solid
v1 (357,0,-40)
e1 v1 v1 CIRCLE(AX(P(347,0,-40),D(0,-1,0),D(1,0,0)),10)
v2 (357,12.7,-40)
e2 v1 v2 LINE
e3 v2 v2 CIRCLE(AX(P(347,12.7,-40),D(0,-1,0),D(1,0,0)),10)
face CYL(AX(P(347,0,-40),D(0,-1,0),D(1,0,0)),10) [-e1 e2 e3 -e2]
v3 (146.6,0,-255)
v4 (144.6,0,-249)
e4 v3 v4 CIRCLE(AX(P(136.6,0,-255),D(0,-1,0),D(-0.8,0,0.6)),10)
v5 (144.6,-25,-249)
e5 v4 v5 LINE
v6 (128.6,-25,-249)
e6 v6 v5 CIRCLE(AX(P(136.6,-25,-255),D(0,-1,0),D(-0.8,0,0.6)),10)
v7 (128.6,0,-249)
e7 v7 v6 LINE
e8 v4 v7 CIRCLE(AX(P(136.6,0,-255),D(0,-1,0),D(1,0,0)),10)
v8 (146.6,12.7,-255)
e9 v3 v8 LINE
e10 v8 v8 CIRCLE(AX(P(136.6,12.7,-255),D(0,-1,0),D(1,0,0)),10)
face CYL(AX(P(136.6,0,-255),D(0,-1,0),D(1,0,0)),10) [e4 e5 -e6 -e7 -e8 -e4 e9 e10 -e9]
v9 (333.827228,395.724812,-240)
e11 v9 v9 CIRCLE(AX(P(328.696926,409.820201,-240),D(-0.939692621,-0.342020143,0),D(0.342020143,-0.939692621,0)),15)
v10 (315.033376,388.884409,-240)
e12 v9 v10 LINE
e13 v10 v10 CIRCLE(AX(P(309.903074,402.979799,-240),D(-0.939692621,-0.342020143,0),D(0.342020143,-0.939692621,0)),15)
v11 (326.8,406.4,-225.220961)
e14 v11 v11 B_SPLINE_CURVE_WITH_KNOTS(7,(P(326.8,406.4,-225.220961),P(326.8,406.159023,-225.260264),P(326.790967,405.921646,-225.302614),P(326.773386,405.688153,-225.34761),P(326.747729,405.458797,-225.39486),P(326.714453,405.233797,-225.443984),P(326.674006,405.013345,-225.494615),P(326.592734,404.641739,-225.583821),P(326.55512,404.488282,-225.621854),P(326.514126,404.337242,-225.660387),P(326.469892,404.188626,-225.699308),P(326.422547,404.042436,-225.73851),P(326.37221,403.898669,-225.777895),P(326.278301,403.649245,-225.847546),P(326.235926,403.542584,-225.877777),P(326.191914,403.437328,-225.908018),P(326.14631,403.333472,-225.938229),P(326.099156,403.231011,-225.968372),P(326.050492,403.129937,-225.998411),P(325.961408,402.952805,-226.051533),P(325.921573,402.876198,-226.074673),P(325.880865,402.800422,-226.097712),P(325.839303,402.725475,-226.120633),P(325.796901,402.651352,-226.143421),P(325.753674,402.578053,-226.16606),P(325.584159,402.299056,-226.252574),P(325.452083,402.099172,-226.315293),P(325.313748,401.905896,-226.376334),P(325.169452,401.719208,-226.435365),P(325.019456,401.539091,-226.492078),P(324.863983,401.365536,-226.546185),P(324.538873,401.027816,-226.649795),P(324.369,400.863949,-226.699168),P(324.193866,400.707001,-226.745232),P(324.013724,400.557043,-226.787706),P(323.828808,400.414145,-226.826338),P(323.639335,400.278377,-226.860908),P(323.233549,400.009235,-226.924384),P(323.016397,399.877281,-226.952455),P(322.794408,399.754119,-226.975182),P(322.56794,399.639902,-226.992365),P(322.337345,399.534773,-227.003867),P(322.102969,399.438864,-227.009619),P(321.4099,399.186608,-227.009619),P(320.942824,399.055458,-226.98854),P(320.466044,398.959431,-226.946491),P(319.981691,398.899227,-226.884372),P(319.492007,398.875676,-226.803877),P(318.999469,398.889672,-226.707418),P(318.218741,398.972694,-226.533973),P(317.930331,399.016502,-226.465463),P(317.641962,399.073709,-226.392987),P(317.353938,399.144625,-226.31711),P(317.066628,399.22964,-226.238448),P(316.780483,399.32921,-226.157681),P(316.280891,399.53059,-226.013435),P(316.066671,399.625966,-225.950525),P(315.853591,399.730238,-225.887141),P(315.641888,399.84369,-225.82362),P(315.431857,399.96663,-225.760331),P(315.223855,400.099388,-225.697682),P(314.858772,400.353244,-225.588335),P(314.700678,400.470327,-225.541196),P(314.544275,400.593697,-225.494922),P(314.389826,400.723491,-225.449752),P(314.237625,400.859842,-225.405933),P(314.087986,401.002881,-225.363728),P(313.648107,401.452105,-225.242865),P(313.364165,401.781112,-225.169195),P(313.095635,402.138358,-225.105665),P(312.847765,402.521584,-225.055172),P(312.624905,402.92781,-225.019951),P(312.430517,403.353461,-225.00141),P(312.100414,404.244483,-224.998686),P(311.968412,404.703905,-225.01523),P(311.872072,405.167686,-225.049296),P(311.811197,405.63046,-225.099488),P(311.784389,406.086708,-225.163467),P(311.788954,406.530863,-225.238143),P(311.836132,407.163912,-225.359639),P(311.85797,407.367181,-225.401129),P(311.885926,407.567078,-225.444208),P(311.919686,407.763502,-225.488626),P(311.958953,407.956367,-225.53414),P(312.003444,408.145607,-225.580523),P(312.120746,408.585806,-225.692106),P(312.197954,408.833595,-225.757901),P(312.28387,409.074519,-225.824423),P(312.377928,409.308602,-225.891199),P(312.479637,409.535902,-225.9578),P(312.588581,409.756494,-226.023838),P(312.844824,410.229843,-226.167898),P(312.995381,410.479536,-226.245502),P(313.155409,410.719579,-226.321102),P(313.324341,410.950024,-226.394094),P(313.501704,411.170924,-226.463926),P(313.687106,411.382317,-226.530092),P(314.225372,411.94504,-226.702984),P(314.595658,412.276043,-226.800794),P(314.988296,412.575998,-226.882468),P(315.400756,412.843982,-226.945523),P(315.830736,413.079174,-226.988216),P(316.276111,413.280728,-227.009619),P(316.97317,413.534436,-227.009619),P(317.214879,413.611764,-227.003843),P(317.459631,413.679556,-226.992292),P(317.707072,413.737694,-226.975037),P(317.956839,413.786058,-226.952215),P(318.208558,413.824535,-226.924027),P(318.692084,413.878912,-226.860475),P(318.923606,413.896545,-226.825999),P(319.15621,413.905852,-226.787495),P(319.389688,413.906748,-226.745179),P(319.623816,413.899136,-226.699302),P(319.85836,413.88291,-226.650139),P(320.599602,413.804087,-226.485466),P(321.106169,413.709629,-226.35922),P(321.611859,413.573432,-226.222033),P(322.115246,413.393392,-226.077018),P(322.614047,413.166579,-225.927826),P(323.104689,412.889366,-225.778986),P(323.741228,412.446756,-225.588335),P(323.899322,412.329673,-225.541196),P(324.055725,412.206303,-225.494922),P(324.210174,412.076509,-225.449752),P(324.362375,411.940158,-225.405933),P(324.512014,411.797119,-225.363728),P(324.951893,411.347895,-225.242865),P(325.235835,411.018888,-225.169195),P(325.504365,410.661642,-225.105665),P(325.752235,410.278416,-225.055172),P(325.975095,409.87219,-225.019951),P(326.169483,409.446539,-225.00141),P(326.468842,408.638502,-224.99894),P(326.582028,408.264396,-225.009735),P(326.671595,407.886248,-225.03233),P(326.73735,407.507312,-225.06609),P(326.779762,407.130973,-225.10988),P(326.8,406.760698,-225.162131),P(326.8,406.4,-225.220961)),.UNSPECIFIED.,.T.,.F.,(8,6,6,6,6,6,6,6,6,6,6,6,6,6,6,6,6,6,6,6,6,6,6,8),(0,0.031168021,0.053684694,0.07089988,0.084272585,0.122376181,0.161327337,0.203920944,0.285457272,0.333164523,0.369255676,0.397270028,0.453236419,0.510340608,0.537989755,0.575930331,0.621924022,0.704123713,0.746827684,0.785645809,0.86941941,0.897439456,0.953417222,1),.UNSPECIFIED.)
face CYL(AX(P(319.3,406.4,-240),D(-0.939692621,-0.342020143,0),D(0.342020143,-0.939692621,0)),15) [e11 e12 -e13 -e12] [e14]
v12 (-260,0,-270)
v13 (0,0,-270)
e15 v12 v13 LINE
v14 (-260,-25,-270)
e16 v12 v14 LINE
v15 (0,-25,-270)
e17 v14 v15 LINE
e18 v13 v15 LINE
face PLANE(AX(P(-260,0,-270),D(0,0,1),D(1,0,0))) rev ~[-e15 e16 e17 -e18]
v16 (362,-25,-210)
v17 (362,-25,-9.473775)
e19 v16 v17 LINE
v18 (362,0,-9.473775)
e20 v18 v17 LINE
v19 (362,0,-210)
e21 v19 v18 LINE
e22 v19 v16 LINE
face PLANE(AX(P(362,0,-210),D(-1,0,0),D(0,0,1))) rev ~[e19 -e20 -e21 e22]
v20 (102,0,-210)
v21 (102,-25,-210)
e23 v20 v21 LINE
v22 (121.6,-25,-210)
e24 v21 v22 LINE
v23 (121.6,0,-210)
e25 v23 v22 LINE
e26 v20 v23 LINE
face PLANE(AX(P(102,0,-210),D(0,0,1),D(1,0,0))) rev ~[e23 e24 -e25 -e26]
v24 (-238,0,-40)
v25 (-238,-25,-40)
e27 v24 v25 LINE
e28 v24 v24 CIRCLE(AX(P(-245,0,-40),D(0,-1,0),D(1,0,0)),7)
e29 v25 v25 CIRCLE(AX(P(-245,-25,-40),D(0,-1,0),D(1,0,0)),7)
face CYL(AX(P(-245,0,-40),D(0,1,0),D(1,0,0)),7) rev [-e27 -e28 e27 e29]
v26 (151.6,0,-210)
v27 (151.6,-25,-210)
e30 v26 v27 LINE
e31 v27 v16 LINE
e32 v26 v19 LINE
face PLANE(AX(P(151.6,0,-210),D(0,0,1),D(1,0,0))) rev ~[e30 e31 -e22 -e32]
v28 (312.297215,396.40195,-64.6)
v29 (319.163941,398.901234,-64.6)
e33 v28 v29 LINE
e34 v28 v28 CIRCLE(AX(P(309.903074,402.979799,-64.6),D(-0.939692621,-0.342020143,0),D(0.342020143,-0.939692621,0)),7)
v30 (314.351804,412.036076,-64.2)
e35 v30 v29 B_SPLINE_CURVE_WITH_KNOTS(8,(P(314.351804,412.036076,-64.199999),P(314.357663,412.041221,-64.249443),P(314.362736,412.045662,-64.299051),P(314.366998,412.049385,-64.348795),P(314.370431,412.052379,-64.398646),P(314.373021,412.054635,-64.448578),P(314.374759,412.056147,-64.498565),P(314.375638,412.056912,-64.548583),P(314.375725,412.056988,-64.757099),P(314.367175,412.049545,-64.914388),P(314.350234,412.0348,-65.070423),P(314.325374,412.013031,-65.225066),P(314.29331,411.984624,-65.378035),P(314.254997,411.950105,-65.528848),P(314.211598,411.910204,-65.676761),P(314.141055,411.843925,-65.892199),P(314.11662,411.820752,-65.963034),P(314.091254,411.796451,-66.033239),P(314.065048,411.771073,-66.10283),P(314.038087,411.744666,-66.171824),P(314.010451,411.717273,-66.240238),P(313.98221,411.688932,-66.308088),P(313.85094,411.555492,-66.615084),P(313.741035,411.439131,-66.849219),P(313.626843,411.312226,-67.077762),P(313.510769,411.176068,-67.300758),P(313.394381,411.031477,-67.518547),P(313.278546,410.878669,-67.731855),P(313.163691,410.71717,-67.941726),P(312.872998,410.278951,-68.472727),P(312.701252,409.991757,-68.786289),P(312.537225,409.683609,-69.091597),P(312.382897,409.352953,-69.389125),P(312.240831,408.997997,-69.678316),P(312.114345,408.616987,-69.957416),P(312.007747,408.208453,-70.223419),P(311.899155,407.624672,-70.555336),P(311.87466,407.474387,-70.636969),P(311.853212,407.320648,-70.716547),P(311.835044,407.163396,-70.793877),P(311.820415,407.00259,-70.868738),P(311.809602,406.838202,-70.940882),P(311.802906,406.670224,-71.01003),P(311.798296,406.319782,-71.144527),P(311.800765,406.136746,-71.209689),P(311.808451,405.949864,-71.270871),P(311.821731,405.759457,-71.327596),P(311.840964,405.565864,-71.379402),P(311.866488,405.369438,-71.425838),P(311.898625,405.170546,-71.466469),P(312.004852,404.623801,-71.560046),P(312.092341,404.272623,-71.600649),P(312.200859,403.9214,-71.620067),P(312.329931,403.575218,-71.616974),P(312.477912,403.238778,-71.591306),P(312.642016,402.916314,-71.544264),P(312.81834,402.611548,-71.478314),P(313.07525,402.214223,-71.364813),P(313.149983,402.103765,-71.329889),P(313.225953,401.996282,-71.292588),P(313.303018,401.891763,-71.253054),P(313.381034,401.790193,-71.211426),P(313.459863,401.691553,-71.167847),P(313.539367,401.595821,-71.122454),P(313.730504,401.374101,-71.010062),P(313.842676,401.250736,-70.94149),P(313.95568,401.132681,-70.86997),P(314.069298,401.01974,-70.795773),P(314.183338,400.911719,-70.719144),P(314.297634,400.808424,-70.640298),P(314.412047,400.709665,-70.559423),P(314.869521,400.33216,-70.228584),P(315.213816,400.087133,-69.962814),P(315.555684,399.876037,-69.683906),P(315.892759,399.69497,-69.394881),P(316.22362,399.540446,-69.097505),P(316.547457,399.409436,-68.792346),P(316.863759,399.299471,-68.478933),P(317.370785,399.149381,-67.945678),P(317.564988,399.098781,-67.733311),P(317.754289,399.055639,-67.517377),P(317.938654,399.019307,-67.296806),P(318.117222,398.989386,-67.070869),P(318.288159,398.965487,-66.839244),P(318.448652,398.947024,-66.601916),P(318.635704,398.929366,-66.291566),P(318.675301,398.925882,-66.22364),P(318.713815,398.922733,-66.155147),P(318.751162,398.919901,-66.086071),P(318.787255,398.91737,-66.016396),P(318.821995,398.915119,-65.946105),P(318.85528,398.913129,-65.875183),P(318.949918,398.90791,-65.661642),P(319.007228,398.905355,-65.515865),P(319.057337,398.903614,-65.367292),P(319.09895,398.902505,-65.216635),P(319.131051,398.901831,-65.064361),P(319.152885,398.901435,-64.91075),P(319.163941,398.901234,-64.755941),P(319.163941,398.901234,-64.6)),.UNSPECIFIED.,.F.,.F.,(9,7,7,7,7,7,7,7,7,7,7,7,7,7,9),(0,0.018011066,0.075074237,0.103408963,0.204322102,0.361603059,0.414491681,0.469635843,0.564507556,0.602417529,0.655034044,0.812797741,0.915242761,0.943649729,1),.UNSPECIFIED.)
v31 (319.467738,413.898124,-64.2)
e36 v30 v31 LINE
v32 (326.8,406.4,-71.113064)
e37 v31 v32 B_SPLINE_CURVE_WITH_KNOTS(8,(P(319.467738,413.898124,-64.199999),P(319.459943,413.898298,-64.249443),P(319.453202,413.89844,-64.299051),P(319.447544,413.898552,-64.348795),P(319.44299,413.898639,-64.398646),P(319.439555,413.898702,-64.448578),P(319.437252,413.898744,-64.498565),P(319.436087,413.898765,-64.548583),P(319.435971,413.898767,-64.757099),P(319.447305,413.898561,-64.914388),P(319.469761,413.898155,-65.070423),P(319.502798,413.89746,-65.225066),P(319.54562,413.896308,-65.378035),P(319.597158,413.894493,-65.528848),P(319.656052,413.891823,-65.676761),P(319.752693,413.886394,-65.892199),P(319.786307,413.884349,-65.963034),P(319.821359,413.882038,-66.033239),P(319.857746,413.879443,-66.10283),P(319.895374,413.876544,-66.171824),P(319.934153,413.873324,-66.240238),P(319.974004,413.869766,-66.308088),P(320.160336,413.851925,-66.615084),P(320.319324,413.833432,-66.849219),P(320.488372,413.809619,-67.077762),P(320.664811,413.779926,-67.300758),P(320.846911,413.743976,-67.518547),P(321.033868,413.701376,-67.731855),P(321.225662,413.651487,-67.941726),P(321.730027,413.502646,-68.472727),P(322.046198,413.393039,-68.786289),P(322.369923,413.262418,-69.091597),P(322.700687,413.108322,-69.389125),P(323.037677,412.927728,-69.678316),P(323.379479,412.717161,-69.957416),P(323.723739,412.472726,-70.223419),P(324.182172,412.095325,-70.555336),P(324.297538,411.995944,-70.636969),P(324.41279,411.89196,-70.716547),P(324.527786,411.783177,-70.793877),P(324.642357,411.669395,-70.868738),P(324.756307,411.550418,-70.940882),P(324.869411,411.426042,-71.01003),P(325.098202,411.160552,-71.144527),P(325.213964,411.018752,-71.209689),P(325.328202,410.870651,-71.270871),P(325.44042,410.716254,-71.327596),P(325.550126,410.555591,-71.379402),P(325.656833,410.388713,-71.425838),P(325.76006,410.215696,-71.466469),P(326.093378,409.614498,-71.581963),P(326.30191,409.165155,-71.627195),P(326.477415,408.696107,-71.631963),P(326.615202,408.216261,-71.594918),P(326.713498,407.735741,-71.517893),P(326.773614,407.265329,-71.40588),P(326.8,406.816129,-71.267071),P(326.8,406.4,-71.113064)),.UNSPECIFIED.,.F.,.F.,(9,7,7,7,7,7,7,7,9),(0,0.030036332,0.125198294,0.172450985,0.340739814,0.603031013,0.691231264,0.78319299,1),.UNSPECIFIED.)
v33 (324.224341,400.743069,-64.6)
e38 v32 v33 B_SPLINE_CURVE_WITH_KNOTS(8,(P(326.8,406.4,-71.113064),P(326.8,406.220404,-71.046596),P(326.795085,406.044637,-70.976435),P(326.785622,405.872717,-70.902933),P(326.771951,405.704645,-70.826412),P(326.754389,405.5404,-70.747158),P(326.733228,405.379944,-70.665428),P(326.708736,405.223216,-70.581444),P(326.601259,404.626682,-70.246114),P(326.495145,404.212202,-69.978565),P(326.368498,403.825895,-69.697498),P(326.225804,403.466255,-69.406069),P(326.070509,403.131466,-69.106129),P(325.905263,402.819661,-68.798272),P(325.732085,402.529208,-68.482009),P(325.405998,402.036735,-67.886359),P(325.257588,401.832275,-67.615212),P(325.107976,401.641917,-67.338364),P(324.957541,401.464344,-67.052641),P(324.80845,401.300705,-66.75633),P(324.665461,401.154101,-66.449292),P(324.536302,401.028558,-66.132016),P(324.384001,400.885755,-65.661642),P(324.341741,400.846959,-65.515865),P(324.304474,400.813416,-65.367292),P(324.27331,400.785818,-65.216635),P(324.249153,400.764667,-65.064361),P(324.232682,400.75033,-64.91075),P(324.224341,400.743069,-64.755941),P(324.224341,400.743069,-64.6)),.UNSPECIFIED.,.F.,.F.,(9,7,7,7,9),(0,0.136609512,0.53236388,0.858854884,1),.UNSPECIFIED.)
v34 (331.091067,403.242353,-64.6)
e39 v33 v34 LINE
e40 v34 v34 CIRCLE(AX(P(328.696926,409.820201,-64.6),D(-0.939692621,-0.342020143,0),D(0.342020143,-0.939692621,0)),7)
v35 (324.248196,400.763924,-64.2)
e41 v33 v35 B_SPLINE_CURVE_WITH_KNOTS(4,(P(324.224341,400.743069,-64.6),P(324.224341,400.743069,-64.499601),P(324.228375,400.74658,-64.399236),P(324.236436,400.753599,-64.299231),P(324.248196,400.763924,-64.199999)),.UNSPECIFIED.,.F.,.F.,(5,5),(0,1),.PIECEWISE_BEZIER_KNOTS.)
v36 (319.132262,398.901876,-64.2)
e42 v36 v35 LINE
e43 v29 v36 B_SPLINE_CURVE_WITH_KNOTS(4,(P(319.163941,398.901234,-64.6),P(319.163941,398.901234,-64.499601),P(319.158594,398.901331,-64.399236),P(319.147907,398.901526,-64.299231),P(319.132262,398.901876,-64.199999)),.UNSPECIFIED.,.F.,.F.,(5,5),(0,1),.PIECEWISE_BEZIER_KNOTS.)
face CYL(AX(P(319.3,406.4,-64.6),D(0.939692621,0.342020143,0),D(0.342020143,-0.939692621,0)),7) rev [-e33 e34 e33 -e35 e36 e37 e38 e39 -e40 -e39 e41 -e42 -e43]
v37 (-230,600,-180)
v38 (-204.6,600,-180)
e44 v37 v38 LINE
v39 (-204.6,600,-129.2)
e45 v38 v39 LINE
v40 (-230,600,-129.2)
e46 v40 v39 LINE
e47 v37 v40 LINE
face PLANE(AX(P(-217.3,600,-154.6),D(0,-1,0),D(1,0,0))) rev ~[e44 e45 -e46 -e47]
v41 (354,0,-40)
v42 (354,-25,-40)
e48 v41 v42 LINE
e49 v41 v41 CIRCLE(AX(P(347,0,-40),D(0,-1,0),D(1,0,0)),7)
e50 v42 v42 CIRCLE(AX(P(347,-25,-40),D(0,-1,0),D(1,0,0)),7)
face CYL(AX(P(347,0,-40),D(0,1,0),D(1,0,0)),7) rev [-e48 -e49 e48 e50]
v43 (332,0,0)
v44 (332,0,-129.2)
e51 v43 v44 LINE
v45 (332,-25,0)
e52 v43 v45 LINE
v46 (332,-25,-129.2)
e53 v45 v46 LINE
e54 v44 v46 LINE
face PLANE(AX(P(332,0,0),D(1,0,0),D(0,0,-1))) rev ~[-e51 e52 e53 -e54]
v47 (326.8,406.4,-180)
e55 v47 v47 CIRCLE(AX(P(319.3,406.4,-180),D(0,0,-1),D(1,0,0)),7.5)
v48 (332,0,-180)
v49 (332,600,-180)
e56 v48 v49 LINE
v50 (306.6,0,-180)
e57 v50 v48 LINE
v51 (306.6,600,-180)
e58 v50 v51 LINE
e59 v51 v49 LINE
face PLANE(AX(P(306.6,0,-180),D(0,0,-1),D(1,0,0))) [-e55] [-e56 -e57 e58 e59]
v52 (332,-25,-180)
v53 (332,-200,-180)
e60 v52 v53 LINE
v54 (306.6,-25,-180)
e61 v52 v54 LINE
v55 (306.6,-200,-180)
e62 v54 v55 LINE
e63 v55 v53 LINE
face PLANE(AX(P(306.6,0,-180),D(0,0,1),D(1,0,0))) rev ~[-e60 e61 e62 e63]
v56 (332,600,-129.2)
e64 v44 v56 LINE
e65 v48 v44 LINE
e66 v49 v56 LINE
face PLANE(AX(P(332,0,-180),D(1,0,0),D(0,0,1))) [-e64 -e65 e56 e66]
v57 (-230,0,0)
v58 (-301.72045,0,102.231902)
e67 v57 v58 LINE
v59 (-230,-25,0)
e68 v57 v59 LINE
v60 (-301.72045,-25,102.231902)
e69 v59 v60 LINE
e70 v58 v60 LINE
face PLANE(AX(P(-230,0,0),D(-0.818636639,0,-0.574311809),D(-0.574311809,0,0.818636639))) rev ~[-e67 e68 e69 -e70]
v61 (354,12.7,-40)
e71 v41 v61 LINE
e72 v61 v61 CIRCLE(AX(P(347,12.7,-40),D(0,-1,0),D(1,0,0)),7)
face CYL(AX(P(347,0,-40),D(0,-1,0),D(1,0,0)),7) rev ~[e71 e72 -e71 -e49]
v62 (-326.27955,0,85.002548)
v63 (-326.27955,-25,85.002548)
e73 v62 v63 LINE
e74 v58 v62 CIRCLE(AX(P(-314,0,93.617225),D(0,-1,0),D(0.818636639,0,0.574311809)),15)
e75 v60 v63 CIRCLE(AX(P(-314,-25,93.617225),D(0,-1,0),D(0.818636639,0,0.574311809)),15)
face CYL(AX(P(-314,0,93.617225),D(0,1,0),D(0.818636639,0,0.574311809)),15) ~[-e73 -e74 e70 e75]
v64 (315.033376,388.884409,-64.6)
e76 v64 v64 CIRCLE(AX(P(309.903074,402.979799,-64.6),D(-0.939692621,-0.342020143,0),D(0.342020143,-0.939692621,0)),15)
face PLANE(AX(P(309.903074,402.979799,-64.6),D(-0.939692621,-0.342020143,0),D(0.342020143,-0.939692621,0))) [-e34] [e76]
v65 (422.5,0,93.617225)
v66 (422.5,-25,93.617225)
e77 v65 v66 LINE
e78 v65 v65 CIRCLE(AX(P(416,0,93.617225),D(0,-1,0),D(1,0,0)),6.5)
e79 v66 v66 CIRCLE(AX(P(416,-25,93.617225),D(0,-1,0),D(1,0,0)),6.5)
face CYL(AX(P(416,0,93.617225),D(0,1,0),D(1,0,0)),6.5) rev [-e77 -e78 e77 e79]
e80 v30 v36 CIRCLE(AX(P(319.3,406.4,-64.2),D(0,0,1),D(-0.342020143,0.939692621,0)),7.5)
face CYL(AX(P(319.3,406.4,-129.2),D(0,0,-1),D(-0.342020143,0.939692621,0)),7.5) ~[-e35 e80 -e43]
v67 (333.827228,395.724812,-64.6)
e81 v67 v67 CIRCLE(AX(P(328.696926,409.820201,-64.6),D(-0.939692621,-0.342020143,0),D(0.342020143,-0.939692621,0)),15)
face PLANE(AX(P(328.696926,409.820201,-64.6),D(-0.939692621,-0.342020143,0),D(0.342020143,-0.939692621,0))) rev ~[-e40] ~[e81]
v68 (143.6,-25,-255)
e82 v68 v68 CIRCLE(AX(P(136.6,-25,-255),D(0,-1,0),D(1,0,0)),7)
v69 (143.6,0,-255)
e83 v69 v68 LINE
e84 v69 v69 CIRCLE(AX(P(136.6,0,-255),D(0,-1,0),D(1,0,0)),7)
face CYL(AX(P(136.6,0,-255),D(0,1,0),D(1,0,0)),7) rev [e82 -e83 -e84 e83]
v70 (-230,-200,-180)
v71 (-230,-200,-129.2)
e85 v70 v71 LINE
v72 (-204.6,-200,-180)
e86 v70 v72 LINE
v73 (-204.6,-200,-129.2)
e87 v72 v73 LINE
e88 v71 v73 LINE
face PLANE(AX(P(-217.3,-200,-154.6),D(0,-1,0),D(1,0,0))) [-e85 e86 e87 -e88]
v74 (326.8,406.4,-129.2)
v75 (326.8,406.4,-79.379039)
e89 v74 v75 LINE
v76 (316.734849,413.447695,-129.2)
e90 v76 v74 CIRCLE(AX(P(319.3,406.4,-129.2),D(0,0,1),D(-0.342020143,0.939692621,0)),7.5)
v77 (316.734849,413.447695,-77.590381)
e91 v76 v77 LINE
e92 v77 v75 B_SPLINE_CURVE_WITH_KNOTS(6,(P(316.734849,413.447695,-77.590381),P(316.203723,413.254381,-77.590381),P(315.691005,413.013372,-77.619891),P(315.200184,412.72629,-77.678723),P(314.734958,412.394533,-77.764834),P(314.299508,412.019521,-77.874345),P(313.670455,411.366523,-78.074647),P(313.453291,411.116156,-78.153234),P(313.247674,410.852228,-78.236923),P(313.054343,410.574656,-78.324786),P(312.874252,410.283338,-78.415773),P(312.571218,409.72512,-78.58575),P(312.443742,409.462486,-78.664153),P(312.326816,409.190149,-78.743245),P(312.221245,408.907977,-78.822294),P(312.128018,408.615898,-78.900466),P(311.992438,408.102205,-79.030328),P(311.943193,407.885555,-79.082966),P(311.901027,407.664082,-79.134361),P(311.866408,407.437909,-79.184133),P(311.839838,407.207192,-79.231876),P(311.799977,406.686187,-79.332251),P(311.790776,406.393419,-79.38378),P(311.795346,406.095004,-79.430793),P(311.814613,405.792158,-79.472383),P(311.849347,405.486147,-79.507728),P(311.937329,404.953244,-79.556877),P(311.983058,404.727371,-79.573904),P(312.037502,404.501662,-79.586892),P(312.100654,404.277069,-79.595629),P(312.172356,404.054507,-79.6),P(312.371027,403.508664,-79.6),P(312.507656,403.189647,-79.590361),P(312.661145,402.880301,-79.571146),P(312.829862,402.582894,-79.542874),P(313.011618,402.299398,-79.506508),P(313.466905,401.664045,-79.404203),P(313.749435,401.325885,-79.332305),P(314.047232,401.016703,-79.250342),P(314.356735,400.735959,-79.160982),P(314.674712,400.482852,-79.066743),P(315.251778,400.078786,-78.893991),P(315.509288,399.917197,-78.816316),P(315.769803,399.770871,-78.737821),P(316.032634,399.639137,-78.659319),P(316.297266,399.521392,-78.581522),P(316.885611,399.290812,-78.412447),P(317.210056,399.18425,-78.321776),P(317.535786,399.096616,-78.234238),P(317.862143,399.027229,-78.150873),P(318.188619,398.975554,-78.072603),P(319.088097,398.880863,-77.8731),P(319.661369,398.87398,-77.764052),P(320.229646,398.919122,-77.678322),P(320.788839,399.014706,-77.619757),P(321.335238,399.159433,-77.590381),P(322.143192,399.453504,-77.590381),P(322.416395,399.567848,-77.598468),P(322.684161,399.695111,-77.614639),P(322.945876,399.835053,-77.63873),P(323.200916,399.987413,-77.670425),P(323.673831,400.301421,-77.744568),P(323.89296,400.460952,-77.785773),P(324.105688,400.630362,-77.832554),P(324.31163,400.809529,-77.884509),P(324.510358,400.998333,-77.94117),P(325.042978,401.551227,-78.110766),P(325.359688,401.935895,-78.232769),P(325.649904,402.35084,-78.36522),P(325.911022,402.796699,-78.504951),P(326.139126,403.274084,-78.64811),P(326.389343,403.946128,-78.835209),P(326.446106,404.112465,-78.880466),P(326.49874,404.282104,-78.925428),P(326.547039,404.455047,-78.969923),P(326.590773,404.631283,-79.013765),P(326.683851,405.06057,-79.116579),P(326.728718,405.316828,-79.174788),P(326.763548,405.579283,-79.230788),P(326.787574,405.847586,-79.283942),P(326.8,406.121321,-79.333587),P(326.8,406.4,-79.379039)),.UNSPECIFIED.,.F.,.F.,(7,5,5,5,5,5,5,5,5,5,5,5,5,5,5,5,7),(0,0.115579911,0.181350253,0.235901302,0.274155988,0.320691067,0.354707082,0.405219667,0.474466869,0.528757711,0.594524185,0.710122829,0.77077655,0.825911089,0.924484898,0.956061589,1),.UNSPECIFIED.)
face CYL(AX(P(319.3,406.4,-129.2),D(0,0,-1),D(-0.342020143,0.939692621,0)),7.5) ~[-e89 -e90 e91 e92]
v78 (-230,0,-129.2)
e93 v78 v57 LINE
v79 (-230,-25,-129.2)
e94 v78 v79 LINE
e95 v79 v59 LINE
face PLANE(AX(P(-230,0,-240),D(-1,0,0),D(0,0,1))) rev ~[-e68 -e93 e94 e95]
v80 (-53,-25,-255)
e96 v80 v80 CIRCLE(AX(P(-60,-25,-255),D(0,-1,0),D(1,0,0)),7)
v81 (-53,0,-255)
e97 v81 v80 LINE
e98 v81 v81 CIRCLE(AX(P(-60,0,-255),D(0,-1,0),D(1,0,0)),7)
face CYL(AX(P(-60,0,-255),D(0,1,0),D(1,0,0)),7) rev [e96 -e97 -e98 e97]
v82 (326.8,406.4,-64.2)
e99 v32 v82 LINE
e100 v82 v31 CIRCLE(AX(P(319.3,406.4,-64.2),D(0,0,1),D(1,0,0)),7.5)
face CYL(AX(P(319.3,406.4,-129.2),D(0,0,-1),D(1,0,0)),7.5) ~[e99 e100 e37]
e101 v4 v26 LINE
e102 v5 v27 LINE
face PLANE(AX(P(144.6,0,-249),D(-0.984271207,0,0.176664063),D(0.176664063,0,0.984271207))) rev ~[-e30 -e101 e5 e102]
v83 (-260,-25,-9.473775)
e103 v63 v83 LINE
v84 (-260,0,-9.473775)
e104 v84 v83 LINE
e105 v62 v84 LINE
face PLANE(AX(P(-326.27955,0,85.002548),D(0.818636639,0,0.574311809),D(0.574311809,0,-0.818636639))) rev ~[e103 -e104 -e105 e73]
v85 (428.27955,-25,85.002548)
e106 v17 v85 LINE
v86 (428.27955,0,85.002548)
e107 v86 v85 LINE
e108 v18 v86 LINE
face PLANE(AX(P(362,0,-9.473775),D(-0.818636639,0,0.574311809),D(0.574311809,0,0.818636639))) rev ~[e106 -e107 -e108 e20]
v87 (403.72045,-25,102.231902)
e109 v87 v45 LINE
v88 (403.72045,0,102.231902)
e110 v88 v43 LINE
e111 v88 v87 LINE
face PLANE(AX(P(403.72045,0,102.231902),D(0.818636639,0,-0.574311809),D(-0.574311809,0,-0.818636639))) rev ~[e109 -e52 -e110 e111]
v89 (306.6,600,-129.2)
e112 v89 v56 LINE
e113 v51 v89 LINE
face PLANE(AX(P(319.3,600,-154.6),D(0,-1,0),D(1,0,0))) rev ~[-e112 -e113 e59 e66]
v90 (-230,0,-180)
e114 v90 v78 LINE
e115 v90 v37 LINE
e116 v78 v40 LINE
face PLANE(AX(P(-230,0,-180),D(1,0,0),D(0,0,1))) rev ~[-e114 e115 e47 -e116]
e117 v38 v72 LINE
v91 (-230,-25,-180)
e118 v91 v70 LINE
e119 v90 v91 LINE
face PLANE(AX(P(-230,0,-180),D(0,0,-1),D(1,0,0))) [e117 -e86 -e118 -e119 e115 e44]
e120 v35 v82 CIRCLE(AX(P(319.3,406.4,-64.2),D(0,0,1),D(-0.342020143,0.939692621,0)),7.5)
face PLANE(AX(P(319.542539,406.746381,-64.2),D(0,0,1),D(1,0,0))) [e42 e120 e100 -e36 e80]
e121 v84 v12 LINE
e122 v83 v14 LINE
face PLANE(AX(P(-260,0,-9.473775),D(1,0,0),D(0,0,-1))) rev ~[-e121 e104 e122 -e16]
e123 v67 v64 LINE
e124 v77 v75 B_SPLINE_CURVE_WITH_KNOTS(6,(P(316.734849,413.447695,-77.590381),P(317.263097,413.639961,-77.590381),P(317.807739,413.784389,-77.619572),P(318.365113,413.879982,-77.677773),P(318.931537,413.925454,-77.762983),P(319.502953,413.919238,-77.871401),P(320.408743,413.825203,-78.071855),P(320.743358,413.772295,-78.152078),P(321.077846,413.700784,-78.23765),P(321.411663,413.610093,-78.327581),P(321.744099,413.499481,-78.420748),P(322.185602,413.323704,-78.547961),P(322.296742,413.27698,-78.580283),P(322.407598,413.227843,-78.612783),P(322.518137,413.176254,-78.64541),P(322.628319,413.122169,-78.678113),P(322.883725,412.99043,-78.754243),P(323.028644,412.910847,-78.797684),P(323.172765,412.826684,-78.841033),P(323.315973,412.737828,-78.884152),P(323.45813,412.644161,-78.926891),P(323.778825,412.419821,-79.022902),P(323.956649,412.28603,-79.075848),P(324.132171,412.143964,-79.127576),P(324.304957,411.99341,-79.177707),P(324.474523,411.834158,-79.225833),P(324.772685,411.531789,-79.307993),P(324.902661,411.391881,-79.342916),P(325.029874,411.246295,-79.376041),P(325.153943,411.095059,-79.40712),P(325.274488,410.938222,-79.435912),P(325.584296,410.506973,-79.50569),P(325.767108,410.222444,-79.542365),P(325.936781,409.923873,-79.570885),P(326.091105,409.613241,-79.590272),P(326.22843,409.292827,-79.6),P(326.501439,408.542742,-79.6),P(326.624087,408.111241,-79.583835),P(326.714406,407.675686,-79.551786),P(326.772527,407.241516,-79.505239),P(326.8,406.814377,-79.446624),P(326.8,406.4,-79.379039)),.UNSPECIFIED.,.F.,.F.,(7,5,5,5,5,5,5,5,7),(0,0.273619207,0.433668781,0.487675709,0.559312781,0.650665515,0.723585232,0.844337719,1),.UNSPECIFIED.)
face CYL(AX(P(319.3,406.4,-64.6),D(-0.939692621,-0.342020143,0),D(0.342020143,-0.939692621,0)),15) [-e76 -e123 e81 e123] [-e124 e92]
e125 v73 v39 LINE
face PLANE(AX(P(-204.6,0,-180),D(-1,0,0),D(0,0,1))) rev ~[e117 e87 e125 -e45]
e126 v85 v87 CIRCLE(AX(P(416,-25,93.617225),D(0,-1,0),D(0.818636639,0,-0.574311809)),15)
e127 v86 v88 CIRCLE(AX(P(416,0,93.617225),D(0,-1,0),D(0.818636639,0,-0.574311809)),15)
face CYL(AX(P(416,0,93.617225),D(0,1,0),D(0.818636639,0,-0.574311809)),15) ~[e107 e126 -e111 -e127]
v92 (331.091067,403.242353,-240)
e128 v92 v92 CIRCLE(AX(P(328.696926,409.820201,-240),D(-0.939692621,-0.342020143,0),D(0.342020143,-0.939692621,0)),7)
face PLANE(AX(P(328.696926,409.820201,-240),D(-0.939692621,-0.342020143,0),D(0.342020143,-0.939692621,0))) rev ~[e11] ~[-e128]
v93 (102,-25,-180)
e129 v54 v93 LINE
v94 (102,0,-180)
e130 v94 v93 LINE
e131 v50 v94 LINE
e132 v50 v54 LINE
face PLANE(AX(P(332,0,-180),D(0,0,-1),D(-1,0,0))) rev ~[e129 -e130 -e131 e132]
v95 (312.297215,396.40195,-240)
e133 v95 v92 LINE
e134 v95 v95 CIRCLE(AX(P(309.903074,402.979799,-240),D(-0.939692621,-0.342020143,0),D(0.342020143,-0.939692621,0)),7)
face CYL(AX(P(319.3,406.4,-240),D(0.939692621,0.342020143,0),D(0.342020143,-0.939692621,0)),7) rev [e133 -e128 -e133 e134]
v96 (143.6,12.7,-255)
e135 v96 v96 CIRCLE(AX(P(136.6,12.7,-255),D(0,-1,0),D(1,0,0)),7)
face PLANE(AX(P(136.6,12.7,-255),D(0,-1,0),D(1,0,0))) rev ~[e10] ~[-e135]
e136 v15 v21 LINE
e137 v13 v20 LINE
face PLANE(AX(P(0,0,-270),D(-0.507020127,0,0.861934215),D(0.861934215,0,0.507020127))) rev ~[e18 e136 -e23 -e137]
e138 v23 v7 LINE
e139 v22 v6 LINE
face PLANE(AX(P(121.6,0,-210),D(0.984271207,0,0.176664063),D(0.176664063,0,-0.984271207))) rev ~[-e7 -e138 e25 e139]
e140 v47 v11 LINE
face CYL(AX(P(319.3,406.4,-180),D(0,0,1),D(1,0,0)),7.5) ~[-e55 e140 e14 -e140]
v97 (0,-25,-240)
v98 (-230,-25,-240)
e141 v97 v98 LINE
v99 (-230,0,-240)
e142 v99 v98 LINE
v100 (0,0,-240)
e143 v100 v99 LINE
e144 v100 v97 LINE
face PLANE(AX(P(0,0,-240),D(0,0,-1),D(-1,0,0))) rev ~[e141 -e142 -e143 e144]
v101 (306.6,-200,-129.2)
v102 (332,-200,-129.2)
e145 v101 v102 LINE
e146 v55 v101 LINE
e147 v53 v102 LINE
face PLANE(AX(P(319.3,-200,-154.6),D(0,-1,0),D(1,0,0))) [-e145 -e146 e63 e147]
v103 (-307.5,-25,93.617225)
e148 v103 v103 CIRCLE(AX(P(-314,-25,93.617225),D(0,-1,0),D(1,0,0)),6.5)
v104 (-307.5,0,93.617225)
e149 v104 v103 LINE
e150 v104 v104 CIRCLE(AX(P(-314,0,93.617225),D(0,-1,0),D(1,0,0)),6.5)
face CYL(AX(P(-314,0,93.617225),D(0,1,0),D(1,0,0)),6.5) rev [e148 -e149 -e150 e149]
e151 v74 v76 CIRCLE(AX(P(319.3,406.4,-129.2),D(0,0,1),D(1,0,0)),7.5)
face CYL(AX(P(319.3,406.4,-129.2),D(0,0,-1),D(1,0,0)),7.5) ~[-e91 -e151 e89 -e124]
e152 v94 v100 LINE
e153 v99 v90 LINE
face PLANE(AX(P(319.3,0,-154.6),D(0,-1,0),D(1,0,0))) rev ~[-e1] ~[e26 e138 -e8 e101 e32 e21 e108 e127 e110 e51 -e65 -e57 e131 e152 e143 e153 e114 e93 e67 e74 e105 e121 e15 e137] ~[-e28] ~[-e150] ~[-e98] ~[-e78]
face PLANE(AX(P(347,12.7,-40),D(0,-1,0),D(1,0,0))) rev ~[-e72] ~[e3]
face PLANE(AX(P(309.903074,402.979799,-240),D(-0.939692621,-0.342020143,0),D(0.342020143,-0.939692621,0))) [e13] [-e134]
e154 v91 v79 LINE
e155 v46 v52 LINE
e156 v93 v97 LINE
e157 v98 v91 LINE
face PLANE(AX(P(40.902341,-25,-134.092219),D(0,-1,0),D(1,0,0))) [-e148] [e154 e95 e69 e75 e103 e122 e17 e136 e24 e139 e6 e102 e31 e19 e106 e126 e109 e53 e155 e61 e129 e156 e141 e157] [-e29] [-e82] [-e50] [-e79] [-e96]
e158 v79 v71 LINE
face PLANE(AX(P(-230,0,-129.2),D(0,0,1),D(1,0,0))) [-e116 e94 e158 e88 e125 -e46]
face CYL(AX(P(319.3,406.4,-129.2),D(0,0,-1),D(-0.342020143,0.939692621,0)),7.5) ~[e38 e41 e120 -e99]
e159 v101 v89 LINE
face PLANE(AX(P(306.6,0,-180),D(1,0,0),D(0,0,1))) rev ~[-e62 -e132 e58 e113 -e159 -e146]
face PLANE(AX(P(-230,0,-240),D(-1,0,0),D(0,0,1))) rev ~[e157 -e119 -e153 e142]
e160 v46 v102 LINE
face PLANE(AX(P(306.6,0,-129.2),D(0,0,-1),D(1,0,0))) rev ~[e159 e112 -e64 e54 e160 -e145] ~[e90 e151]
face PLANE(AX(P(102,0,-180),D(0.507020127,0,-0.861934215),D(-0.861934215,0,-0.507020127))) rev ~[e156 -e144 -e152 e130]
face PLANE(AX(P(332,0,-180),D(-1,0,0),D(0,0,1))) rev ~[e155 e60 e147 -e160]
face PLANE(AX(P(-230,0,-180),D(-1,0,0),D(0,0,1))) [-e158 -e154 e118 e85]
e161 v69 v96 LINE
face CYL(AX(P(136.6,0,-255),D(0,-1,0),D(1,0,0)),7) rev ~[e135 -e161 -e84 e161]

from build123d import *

# Parameters (mm, degrees)
F0_R          = 7
F0_R_2        = 6.5
F1_DEPTH      = 25
F2_W          = 25.4
F2_H          = 50.8
F3_DEPTH      = 200
F3_DEPTH_BACK = 600
F6_DEPTH      = 65
F8_R          = 15
F8_R_2        = 7
F9_DEPTH      = 10
F10_R         = 15
F10_R_2       = 7
F11_DEPTH     = 10
F12_R         = 7.5
F13_REACH     = 111.2142034356
F14_R         = 10
F14_R_2       = 7
F15_DEPTH     = 12.7
F16_R         = 10
F16_R_2       = 7
F17_DEPTH     = 12.7


with BuildPart() as f1:
    # F0 (on Front) → F1 (new body)
    with BuildSketch(Plane.XZ):
        with BuildLine():
            Line((-230, 0), (-301.7204504189, 102.2319018363))
            ThreePointArc((-301.7204504189, 102.2319018363), (-322.6146771319, 105.8967742855), (-326.2795495811, 85.0025475726))
            Line((-326.2795495811, 85.0025475726), (-260, -9.4737749679))
            Line((-260, -9.4737749679), (-260, -270))
            Line((-260, -270), (0, -270))
            Line((0, -270), (102, -210))
            Line((102, -210), (121.6, -210))
            Line((121.6, -210), (128.6, -249))
            ThreePointArc((128.6, -249), (136.6, -265), (144.6, -249))
            Line((144.6, -249), (151.6, -210))
            Line((151.6, -210), (362, -210))
            Line((362, -210), (362, -9.4737749679))
            Line((362, -9.4737749679), (428.2795495811, 85.0025475726))
            ThreePointArc((428.2795495811, 85.0025475726), (424.6146771319, 105.8967742855), (403.7204504189, 102.2319018363))
            Line((403.7204504189, 102.2319018363), (332, 0))
            Line((332, 0), (332, -129.2))
            Line((332, -129.2), (332, -180))
            Line((332, -180), (306.6, -180))
            Line((306.6, -180), (102, -180))
            Line((102, -180), (0, -240))
            Line((0, -240), (-230, -240))
            Line((-230, -240), (-230, 0))
        make_face()
        with Locations((-60, -255)):
            Circle(F0_R, mode=Mode.SUBTRACT)
        with Locations((136.6, -255)):
            Circle(F0_R, mode=Mode.SUBTRACT)
        with Locations((-245, -40)):
            Circle(F0_R, mode=Mode.SUBTRACT)
        with Locations((-314, 93.6172247045)):
            Circle(F0_R_2, mode=Mode.SUBTRACT)
        with Locations((347, -40)):
            Circle(F0_R, mode=Mode.SUBTRACT)
        with Locations((416, 93.6172247045)):
            Circle(F0_R_2, mode=Mode.SUBTRACT)
    extrude(amount=F1_DEPTH)

    # F2 (on Front) → F3 (join, two sides)
    with BuildSketch(Plane.XZ) as f3_sk:
        with Locations((319.3, -154.6)):
            Rectangle(F2_W, F2_H)
        with Locations((-217.3, -154.6)):
            Rectangle(F2_W, F2_H)
    extrude(amount=F3_DEPTH)
    extrude(f3_sk.sketch, amount=-F3_DEPTH_BACK)

    # F5 (on face) → F6 (join)
    with BuildSketch(Plane.XY.offset(-129.2)):
        with BuildLine():
            ThreePointArc((316.7348489251, 413.4476946559), (314.9981767274, 400.2563596678), (326.8, 406.4))
            ThreePointArc((326.8, 406.4), (323.6018232726, 412.5436403322), (316.7348489251, 413.4476946559))
        make_face()
    extrude(amount=F6_DEPTH)

    # F8 (on face) → F9 (join, symmetric)
    with BuildSketch(Plane(origin=(412.5634376322, 150.1608110447, 0), x_dir=(0.3420201433, -0.9396926208, 0), z_dir=(-0.9396926208, -0.3420201433, 0))):
        with Locations((-272.6840493235, -64.6)):
            Circle(F8_R)
        with Locations((-272.6840493235, -64.6)):
            Circle(F8_R_2, mode=Mode.SUBTRACT)
    extrude(amount=F9_DEPTH, both=True)



with BuildPart() as f11:
    # F10 (on face) → F11 (new body, symmetric)
    with BuildSketch(Plane(origin=(412.5634376322, 150.1608110447, 0), x_dir=(0.3420201433, -0.9396926208, 0), z_dir=(-0.9396926208, -0.3420201433, 0))):
        with Locations((-272.6840493235, -240)):
            Circle(F10_R)
        with Locations((-272.6840493235, -240)):
            Circle(F10_R_2, mode=Mode.SUBTRACT)
    extrude(amount=F11_DEPTH, both=True)


with BuildPart() as f1_1:
    add(f1.part)

    add(f11.part)  # F13 merges F11
    f13_end = f1_1.faces().sort_by_distance((314.1696978501, 420.4953893118, -240))[0]
    # F12 (on face) → F13 (join, up to a face of the model that its end follows)
    with BuildSketch(Plane(origin=(0, 0, -180), x_dir=(1, 0, 0), z_dir=(0, 0, -1))):
        with Locations((319.3, -406.4)):
            Circle(F12_R)
    f13_long = extrude(amount=F13_REACH, mode=Mode.PRIVATE)
    add(split(f13_long, bisect_by=f13_end, keep=Keep.ALL, mode=Mode.PRIVATE).solids().sort_by_distance((319.3, 406.4, -180))[0])

    # F14 (on face) → F15 (join)
    with BuildSketch(Plane.XZ):
        with Locations((136.6, -255)):
            Circle(F14_R)
        with Locations((136.6, -255)):
            Circle(F14_R_2, mode=Mode.SUBTRACT)
    extrude(amount=-F15_DEPTH)

    # F16 (on face) → F17 (join)
    with BuildSketch(Plane.XZ):
        with Locations((347, -40)):
            Circle(F16_R)
        with Locations((347, -40)):
            Circle(F16_R_2, mode=Mode.SUBTRACT)
    extrude(amount=-F17_DEPTH)


solid = f1_1.part
